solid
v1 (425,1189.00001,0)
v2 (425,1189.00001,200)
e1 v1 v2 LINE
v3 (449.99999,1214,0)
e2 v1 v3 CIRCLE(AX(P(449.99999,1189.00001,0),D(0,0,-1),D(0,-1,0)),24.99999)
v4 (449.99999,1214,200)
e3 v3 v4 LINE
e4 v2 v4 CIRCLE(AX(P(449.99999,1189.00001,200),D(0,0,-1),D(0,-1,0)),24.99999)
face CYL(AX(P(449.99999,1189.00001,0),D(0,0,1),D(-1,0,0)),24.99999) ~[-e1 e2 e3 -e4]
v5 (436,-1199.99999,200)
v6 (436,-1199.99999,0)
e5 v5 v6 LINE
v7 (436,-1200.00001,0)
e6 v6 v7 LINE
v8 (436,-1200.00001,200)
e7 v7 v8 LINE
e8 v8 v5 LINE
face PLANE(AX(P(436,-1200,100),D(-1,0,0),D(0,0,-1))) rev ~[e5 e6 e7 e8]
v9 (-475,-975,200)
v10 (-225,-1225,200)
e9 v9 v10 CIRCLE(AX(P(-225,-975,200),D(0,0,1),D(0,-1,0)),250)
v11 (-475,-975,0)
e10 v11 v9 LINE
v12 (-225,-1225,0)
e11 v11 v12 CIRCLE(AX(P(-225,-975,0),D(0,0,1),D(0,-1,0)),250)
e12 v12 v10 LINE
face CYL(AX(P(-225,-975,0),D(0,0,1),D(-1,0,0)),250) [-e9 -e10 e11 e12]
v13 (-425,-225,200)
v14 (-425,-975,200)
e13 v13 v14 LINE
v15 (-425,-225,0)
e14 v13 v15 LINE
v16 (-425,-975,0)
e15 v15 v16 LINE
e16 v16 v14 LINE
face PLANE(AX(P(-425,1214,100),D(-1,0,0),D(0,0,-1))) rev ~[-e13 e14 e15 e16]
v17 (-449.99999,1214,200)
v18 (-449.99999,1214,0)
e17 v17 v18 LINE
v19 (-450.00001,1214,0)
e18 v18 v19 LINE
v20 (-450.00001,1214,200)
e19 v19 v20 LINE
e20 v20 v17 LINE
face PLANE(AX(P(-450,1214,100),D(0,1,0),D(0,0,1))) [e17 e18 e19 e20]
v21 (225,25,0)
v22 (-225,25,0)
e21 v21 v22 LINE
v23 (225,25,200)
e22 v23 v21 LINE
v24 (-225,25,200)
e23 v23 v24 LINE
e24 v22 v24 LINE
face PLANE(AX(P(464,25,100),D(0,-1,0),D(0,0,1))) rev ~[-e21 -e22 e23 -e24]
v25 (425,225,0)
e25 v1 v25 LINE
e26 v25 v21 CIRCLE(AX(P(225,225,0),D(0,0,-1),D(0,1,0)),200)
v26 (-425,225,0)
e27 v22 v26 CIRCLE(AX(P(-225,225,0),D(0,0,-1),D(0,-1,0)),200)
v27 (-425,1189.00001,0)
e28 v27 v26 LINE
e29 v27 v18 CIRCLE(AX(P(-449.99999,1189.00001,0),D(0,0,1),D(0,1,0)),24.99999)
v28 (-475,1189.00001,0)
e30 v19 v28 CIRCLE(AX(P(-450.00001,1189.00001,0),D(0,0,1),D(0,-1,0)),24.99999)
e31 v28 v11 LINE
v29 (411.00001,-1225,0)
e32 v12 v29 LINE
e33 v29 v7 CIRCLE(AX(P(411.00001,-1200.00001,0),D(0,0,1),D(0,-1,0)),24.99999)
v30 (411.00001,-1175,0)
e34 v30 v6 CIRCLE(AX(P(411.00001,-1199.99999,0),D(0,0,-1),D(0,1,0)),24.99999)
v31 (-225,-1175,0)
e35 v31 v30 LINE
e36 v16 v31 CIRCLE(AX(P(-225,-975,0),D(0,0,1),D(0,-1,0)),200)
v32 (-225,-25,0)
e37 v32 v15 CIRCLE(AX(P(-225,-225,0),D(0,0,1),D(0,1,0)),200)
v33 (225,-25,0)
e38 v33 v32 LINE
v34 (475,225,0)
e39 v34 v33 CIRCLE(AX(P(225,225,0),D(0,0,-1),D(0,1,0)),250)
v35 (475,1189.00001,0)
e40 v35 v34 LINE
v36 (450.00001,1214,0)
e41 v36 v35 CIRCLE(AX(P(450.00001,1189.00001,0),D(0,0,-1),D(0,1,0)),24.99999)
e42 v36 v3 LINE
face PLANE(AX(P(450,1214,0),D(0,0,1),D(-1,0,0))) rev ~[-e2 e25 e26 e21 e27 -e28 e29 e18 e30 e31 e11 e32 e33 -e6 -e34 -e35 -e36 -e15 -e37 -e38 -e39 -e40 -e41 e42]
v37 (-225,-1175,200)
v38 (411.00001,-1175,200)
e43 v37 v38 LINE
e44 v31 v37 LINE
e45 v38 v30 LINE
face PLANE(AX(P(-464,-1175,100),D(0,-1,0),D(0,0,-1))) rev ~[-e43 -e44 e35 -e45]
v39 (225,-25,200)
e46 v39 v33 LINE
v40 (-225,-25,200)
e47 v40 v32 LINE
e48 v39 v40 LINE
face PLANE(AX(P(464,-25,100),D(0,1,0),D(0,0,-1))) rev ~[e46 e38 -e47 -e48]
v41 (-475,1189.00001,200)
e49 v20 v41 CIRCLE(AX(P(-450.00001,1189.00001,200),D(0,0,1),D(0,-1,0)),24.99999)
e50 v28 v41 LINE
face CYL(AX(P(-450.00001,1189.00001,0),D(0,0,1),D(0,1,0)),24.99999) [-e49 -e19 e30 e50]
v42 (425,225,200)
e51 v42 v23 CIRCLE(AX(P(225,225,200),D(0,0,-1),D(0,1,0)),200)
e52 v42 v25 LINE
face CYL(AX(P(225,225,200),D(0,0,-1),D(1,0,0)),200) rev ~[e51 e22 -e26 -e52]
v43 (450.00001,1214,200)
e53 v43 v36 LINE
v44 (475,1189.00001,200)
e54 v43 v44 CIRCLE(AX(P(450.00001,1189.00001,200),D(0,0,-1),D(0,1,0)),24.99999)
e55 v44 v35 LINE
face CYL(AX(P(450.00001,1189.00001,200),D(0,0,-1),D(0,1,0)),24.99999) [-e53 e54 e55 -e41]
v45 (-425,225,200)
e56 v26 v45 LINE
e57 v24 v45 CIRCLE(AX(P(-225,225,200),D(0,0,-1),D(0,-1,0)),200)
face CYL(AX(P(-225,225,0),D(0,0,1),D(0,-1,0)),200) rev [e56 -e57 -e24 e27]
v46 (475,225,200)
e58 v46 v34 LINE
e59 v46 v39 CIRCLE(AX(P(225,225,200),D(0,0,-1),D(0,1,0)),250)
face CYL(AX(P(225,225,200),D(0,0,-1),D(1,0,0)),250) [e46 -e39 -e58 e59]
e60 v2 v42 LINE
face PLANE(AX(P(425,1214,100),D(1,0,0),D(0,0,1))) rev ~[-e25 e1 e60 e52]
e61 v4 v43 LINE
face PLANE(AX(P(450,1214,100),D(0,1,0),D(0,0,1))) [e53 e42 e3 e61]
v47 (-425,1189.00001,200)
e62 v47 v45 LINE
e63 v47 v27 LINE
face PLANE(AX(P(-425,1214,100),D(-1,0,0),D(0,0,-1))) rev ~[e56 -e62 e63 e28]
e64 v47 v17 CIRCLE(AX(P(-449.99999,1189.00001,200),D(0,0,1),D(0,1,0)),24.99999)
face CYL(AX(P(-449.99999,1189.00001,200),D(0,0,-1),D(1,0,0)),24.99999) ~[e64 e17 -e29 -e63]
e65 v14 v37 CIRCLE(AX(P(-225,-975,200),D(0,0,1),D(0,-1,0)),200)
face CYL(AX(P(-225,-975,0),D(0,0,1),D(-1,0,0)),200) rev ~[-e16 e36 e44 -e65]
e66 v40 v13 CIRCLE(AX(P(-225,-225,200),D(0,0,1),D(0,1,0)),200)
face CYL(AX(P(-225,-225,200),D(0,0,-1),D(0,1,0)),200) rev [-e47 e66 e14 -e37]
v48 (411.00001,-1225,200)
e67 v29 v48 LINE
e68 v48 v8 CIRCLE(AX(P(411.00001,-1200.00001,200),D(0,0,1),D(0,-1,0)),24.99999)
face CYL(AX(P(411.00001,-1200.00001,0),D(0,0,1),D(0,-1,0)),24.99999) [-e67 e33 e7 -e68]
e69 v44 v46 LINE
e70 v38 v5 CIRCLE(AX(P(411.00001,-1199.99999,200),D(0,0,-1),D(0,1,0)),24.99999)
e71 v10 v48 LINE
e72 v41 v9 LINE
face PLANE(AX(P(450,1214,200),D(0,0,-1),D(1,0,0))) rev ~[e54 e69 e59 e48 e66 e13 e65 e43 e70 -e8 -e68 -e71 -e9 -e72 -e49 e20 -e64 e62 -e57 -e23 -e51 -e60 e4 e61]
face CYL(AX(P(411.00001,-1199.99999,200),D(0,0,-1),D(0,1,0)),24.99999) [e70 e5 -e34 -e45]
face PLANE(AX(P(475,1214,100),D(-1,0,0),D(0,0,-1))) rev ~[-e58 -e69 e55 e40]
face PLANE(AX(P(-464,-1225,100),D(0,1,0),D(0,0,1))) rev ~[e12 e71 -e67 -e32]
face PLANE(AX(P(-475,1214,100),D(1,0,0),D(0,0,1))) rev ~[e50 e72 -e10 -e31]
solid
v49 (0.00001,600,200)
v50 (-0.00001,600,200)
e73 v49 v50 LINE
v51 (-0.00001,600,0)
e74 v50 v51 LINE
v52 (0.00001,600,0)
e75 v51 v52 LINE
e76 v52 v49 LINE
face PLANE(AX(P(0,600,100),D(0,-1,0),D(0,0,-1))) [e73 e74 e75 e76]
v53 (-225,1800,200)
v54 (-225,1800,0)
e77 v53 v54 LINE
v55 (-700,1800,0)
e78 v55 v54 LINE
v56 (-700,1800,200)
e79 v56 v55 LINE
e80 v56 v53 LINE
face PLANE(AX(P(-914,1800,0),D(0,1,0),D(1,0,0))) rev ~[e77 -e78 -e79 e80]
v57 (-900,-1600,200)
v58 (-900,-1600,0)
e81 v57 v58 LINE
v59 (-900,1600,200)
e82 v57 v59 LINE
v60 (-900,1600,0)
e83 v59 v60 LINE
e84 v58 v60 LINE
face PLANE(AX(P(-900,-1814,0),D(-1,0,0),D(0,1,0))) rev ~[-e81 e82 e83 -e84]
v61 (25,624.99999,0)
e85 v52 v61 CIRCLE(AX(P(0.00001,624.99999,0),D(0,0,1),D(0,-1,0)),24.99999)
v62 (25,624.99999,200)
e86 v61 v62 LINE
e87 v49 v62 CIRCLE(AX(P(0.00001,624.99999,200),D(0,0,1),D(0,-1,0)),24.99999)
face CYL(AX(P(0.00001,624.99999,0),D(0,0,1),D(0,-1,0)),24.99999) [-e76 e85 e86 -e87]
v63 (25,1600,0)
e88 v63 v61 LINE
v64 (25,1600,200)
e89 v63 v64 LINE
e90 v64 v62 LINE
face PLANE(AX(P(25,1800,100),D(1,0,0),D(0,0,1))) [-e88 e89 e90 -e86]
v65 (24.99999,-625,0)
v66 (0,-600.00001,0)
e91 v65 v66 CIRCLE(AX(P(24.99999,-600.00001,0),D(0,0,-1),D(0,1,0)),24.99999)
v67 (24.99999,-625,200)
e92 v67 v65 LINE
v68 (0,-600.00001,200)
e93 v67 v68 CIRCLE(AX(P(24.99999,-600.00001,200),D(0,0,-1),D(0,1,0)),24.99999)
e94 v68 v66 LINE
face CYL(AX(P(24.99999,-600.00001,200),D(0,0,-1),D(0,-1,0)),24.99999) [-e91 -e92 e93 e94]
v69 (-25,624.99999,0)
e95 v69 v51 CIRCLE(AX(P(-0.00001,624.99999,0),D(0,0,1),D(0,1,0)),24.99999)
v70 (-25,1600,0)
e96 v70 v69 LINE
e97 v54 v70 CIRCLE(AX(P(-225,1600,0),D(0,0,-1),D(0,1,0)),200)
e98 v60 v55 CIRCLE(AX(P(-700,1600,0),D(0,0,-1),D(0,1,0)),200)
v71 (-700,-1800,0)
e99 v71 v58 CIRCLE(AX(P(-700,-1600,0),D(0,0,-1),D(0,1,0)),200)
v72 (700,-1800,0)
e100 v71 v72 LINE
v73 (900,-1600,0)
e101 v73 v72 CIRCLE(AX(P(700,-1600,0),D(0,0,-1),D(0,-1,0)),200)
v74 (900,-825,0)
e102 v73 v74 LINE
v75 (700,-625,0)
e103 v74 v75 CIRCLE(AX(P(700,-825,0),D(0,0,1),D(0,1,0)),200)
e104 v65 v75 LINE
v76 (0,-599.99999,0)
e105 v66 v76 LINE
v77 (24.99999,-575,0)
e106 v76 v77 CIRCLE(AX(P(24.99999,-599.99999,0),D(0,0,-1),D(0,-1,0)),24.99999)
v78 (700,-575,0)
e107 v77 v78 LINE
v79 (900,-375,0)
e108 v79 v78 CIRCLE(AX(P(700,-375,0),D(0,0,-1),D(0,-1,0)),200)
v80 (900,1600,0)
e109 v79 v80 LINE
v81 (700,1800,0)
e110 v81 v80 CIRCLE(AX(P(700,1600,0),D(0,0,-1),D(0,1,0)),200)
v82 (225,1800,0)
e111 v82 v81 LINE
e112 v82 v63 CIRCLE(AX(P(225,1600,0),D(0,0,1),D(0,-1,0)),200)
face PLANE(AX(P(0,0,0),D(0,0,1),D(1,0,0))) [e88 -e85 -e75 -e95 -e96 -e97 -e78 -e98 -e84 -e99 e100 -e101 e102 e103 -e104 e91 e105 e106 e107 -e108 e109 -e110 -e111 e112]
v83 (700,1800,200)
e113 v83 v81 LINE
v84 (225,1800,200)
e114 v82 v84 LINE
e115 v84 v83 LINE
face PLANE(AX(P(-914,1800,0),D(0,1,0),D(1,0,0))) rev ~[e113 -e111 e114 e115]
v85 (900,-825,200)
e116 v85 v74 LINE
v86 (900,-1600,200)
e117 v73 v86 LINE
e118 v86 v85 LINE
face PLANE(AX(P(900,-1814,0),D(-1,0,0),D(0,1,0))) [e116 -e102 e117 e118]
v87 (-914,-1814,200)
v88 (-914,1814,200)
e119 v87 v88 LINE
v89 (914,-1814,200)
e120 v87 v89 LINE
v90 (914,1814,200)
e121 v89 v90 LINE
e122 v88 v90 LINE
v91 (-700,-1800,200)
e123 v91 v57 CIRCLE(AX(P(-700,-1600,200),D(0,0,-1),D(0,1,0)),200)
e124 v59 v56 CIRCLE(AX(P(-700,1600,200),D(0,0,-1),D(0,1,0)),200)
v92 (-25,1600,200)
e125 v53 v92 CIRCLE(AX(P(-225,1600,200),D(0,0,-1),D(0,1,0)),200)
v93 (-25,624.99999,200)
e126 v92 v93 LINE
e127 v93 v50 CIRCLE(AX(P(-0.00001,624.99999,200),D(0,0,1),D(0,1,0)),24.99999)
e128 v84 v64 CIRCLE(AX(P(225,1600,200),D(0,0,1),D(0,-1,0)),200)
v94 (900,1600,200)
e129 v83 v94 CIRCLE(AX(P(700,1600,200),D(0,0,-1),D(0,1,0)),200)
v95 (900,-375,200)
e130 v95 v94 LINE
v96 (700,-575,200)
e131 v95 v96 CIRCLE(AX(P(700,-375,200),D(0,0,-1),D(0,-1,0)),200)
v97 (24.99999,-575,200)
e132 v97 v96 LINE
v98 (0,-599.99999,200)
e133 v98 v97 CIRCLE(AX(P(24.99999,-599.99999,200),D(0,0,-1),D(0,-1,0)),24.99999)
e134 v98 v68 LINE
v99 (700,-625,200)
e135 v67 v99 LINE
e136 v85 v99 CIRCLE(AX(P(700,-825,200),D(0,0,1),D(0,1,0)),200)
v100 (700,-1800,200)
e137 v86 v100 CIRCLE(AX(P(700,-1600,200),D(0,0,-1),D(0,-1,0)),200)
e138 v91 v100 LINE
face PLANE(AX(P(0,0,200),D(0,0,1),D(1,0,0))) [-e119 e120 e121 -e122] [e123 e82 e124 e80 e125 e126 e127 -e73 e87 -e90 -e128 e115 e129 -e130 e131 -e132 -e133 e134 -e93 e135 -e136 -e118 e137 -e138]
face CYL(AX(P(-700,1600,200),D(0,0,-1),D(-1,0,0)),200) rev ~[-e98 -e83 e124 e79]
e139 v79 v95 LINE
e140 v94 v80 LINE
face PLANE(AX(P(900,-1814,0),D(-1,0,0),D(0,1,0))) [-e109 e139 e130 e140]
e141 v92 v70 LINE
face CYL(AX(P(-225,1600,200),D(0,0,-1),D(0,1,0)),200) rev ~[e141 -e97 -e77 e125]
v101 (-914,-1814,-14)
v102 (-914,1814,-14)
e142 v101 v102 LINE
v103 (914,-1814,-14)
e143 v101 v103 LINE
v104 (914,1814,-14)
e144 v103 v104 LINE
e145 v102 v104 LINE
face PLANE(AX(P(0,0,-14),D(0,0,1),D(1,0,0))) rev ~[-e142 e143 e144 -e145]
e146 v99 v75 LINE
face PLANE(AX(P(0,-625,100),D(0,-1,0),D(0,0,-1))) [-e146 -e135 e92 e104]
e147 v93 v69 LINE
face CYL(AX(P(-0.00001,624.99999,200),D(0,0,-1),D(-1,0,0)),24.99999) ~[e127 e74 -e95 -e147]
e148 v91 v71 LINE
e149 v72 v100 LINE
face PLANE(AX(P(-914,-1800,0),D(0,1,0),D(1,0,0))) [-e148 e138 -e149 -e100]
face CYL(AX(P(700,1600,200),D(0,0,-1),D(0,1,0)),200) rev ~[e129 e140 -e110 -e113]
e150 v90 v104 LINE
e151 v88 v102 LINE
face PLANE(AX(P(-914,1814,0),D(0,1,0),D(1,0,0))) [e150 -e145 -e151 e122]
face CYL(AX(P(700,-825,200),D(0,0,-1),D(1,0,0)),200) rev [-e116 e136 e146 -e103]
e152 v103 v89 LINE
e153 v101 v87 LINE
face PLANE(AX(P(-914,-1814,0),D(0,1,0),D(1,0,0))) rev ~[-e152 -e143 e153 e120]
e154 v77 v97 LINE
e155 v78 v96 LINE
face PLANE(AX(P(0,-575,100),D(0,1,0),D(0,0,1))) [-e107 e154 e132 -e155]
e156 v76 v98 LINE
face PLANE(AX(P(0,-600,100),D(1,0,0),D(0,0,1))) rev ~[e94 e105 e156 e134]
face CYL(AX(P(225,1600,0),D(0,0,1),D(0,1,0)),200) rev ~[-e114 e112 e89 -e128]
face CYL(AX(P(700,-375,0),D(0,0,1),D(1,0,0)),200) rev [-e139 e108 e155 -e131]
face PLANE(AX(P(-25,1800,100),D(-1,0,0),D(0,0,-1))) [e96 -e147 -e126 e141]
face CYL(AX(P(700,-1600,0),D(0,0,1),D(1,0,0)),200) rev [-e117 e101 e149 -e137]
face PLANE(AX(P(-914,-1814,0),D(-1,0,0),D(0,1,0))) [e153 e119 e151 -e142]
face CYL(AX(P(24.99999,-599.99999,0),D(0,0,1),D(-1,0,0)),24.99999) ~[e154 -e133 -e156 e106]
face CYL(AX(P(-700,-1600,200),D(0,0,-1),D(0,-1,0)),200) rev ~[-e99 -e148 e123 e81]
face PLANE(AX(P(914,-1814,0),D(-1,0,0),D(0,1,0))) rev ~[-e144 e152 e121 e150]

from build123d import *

# Parameters (mm, degrees)
F6_W          = 1828
F6_H          = 3628
F7_DEPTH      = 14
F7_DEPTH_BACK = 200
F8_T          = -14
F14_W         = 50
F14_H         = 200
F13_W         = 50
F13_H         = 200
F12_W         = 50
F12_H         = 200
F20_R         = 200
F20_2_R       = 200
F21_R         = 24.99999
F21_2_R       = 24.99999
F22_R         = 250


# Not quite as in the source:
# - a fillet or chamfer is up to 0.001 mm smaller than in the source, because OpenCascade refuses the exact size


with BuildPart() as f7:
    # F6 (on Top) → F7 (new body, two sides)
    with BuildSketch(Plane.XY) as f7_sk:
        Rectangle(F6_W, F6_H)
    extrude(amount=-F7_DEPTH)
    extrude(f7_sk.sketch, amount=F7_DEPTH_BACK)

    # F8
    f8_openings = [f7.faces().sort_by_distance(p)[0] for p in [
        (0, 0, 200),
    ]]
    offset(amount=F8_T, openings=f8_openings)

    # F15: sweep along a path in F9
    with BuildLine(Plane.XY) as f15_path:
        Line((0, -600), (900, -600))
    # F14 (on Right) → F15 (sweep)
    with BuildSketch(Plane.YZ):
        with Locations((-600, 100)):
            Rectangle(F14_W, F14_H)
    sweep(path=f15_path.line)

    # F17: sweep along a path in F9
    with BuildLine(Plane.XY) as f17_path:
        Line((0, 1800), (0, 600))
    # F12 (on plane+point) → F17 (sweep)
    with BuildSketch(Plane.XZ.offset(-600)):
        with Locations((0, 100)):
            Rectangle(F12_W, F12_H)
    sweep(path=f17_path.line)

    # F20
    f20_edges = [f7.edges().sort_by_distance(p)[0] for p in [
        (25, 1800, 100),
        (900, 1800, 100),
        (-25, 1800, 100),
        (-900, 1800, 100),
        (-900, -1800, 100),
        (900, -575, 100),
        (900, -625, 100),
        (900, -1800, 100),
    ]]
    fillet(f20_edges, radius=F20_R)

    # F21 (radius 25 in the source; OpenCascade refuses exactly that, so slightly less here)
    f21_edges = [f7.edges().sort_by_distance(p)[0] for p in [
        (-25, 600, 100),
        (25, 600, 100),
        (0, -575, 100),
        (0, -625, 100),
    ]]
    fillet(f21_edges, radius=F21_R)


with BuildPart() as f16:
    # F16: sweep along a path in F9
    with BuildLine(Plane.XY) as f16_path:
        Line((-450, 1200), (-450, -1200))
        Line((-450, -1200), (450, -1200))
    # F13 (on offset) → F16 (sweep)
    with BuildSketch(Plane(origin=(0, 1214, 0), x_dir=(-1, 0, 0), z_dir=(0, 1, 0))):
        with Locations((450, 100)):
            Rectangle(F13_W, F13_H)
    sweep(path=f16_path.line, transition=Transition.RIGHT)

    # F18: sweep along a path in F9
    with BuildLine(Plane.XY) as f18_path:
        Line((450, 1200), (450, 0))
        Line((450, 0), (-450, 0))
    # F13 (on offset) → F18 (sweep)
    with BuildSketch(Plane(origin=(0, 1214, 0), x_dir=(-1, 0, 0), z_dir=(0, 1, 0))):
        with Locations((-450, 100)):
            Rectangle(F13_W, F13_H)
    sweep(path=f18_path.line, transition=Transition.RIGHT)

    # F19: union 

    # F20#2
    f20_2_edges = [f16.edges().sort_by_distance(p)[0] for p in [
        (-425, -1175, 100),
        (425, 25, 100),
        (-425, 25, 100),
        (-425, -25, 100),
    ]]
    fillet(f20_2_edges, radius=F20_2_R)

    # F21#2 (radius 25 in the source; OpenCascade refuses exactly that, so slightly less here)
    f21_2_edges = [f16.edges().sort_by_distance(p)[0] for p in [
        (436, -1175, 100),
        (436, -1225, 100),
        (425, 1214, 100),
        (475, 1214, 100),
        (-475, 1214, 100),
        (-425, 1214, 100),
    ]]
    fillet(f21_2_edges, radius=F21_2_R)

    # F22
    f22_edges = [f16.edges().sort_by_distance(p)[0] for p in [
        (475, -25, 100),
        (-475, -1225, 100),
    ]]
    fillet(f22_edges, radius=F22_R)


solid = Compound([f7.part, f16.part])
